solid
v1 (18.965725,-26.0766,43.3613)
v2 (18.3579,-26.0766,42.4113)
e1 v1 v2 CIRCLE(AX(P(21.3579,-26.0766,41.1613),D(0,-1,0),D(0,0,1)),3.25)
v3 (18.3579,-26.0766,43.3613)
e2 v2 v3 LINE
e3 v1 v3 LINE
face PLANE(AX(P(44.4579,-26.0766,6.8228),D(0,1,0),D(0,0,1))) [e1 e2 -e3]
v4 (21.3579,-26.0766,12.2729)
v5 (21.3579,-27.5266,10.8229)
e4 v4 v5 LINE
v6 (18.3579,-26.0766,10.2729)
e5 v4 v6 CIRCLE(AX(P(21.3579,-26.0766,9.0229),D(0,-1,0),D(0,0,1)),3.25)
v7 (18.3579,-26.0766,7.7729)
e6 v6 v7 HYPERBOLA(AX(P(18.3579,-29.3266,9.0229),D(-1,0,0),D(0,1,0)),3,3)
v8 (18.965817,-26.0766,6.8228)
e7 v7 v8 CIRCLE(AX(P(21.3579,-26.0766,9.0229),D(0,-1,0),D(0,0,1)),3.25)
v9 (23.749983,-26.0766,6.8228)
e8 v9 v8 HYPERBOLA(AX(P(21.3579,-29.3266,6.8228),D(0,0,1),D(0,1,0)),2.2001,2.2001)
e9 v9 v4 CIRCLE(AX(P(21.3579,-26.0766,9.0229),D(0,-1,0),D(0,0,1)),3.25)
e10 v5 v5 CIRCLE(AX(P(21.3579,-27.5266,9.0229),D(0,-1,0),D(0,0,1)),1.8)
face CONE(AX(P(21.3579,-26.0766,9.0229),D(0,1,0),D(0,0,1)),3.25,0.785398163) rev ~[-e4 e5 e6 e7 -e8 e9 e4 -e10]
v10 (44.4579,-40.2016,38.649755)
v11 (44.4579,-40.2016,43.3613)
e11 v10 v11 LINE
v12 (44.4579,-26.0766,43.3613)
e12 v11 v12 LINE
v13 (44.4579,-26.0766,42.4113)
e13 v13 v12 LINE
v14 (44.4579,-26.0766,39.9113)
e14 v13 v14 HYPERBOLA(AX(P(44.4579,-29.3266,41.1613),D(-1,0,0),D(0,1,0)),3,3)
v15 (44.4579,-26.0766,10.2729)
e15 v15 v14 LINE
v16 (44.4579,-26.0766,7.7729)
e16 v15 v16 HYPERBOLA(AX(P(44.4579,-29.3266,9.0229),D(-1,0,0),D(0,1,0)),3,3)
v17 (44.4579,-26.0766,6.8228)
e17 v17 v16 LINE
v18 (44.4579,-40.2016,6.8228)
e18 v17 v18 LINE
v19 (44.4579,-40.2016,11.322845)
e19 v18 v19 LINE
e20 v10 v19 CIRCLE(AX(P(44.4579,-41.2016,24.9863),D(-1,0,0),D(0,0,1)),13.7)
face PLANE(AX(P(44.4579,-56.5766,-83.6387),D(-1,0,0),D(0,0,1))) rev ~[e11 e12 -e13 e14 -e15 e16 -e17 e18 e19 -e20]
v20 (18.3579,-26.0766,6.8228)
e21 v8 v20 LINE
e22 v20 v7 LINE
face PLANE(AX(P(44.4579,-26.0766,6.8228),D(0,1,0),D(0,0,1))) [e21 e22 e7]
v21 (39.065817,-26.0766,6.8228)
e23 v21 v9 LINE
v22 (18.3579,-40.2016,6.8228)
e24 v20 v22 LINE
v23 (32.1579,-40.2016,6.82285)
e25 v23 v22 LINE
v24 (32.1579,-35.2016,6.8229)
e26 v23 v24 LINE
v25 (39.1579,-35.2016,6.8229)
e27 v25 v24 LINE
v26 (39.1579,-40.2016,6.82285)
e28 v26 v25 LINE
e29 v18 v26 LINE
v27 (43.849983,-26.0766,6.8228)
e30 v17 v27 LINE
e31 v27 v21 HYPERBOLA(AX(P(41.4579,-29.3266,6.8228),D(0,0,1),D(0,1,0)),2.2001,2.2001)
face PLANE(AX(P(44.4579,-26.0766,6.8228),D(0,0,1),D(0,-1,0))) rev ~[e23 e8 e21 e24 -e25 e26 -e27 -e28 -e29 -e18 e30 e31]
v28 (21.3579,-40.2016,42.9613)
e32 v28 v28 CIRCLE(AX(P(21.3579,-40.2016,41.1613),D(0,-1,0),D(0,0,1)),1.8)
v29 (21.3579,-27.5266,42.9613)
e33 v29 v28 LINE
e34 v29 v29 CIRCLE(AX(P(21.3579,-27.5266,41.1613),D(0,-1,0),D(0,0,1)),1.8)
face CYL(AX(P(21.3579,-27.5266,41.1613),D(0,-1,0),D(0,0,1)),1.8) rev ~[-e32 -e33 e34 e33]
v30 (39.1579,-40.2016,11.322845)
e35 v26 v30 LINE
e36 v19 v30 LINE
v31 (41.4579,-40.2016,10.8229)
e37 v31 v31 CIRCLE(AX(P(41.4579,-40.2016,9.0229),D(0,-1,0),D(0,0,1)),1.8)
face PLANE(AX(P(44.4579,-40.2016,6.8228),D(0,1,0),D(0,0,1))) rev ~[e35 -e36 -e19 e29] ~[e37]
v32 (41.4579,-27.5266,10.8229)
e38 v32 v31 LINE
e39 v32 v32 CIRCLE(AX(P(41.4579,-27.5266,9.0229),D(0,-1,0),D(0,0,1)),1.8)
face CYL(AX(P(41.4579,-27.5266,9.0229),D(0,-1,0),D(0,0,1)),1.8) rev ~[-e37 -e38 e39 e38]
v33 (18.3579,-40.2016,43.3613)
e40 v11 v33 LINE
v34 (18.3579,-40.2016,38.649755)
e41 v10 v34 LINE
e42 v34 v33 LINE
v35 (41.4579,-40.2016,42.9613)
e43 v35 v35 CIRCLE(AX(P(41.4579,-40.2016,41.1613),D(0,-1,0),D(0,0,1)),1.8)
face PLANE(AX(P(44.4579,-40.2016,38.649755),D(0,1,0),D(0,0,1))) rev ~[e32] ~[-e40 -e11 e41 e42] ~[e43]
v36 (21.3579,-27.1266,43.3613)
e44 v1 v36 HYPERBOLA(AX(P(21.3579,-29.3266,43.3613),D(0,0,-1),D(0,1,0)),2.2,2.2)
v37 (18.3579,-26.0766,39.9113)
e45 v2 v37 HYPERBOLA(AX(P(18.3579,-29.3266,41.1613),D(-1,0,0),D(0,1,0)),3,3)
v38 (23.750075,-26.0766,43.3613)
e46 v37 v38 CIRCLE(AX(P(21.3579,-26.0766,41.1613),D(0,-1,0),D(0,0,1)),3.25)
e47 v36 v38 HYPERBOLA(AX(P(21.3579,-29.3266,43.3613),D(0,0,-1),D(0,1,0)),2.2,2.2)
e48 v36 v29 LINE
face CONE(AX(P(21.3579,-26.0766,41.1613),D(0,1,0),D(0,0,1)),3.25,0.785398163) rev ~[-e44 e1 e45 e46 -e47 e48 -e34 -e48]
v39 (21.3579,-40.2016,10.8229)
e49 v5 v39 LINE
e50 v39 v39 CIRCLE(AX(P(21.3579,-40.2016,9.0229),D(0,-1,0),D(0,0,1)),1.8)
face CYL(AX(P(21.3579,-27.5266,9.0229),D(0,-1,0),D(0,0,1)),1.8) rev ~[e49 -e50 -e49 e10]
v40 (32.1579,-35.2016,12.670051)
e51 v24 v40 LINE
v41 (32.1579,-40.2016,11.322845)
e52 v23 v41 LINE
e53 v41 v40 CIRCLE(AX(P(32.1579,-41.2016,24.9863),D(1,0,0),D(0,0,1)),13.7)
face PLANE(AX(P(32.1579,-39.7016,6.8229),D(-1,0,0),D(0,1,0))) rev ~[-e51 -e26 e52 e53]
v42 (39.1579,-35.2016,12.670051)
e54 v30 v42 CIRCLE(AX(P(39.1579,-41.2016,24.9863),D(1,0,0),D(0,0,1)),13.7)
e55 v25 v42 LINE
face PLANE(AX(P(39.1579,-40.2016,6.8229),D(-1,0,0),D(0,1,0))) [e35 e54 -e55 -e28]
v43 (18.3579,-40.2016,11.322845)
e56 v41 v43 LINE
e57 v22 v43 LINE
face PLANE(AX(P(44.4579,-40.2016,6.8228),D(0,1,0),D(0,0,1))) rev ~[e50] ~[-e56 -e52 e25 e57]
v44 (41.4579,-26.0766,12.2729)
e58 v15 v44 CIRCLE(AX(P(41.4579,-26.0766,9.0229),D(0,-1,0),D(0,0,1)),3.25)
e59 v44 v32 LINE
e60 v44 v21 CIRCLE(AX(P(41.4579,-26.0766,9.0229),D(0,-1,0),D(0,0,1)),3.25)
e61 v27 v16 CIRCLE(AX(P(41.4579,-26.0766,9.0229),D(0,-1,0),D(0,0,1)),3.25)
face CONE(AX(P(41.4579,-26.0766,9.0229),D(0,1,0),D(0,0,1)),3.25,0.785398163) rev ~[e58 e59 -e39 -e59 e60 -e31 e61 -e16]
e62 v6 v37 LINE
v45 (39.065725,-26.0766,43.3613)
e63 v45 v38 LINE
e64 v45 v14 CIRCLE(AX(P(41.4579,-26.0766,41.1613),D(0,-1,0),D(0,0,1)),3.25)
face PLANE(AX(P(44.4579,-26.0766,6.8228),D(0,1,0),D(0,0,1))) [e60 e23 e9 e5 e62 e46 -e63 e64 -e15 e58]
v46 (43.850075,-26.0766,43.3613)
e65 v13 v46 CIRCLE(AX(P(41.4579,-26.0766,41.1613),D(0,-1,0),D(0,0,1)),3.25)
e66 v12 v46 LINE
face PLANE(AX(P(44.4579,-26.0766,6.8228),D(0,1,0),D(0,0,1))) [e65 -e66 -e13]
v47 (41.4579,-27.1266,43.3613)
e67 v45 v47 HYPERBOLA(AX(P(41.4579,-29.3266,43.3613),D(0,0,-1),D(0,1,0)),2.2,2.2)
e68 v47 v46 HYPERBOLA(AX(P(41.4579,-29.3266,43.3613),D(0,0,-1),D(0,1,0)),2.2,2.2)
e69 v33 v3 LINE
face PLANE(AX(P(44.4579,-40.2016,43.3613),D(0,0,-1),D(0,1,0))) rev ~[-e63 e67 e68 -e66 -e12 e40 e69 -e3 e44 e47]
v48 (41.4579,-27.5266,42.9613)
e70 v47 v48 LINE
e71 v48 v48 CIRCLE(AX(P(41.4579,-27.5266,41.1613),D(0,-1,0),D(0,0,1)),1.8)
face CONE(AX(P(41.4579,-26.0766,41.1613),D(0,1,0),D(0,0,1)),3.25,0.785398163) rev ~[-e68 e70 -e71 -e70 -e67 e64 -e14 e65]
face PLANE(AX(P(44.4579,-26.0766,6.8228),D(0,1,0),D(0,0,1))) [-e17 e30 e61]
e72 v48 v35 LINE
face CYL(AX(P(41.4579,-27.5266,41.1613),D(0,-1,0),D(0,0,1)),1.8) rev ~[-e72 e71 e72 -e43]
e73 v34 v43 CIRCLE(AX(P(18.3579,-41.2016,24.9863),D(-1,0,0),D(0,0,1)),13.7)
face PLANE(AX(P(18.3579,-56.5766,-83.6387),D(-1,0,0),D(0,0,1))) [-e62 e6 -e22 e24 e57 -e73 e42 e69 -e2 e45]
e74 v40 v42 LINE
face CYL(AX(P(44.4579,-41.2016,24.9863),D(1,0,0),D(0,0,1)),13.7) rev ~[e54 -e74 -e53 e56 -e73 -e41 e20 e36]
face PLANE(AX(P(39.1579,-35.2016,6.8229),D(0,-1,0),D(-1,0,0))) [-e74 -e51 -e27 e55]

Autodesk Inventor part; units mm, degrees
ref_plane "YZ Plane" through (0, 0, 0) normal (1, 0, 0) x (0, 1, 0)
ref_plane "XZ Plane" through (0, 0, 0) normal (0, 1, 0) x (-1, 0, 0)
ref_plane "Work Plane1" through (44.4579, -56.5766, -83.6387) normal (-1, 0, 0) x (0, 0, 1)
sketch "Sketch1" plane through (44.4579, -56.5766, -83.6387) normal (-1, 0, 0) x (0, 0, 1)
  line L0 (90.4615, 0) -> (90.4615, 14.375) projected
  line L1 (90.4615, 14.375) -> (94.9615, 14.375) projected
  arc A0 (94.9615, 14.375) -> (122.2885, 14.375) centre (108.625, 15.375) ccw projected
  line L2 (122.2885, 14.375) -> (127, 14.375) projected
  line L3 (127, 14.375) -> (127, 30.5) projected
  line L4 (52.8275, 30.5) -> (127, 30.5) projected
  line L5 (52.8275, 30.5) -> (52.8275, 10) projected
  line L6 (52.8275, 10) -> (59.8275, 10) projected
  line L7 (59.8275, 10) -> (59.8275, 0) projected
  line L8 (59.8275, 0) -> (90.4615, 0) projected
  line L9 (119.625, 13.875) -> (120.125, 13.875) projected
  line L10 (120.125, 13.875) -> (120.125, 16.875) projected
  line L11 (120.125, 16.875) -> (119.625, 16.875) projected
  line L12 (119.625, 16.875) -> (119.625, 13.875) projected
  line L13 (97.125, 16.875) -> (96.625, 16.875) projected
  line L14 (96.625, 16.875) -> (96.625, 13.875) projected
  line L15 (96.625, 13.875) -> (97.125, 13.875) projected
  line L16 (97.125, 13.875) -> (97.125, 16.875) projected
  circle A1 centre (108.625, 15.375) radius 5 projected
  circle A2 centre (108.625, 15.375) radius 13.7 projected
  line L17 (90.4615, 14.375) -> (127, 14.375)
  line L18 (127, 14.375) -> (127, 30.5)
  line L19 (127, 30.5) -> (90.4615, 30.5)
  line L20 (90.4615, 30.5) -> (90.4615, 14.375)
  line L21 (90.4615, 16.375) -> (127, 16.375)
  point P0 (83.6387, 56.5766)
  point P1 (94.9615, 16.375)
  point P2 (122.2885, 16.375)
  point P3 (127, 16.375)
  dimension "d0" = 2
ref_plane "Work Plane2" through (18.3579, -55.5766, 10.6113) normal (1, 0, 0) x (0, 1, 0)
extrude "Extrusion1" add sketch "Sketch1" along normal up to surface (26.1 mm away) contours L20 L4 L3 L21 A2
sketch "Sketch2" plane through (44.4579, -26.0766, 43.3613) normal (0, 1, 0) x (1, 0, 0)
  line L0 (-26.1, 0) -> (-26.1, 4.7115) projected
  line L1 (0, 0) -> (-26.1, 0) projected
  line L2 (0, 4.7115) -> (0, 0) projected
  line L3 (0, 4.7115) -> (-26.1, 4.7115) projected
  line L4 (-26.1, 32.0385) -> (-26.1, 36.5385) projected
  line L5 (0, 32.0385) -> (-26.1, 32.0385) projected
  line L6 (0, 36.5385) -> (0, 32.0385) projected
  line L7 (0, 36.5385) -> (-26.1, 36.5385) projected
  line L8 (-3, 34.3385) -> (-23.1, 34.3385)
  line L9 (-23.1, 34.3385) -> (-23.1, 2.2)
  line L10 (-23.1, 2.2) -> (-3, 2.2)
  line L11 (-3, 2.2) -> (-3, 34.3385)
  point P0 (-44.4579, 43.3613)
  dimension "d3" = 2.2
  dimension "d4" = 2.2
  dimension "d5" = 3
  dimension "d6" = 3
hole "Hole1" at (41.4579, -26.0766, 9.0229) at (41.4579, -26.0766, 41.1613) at (21.3579, -26.0766, 41.1613) at (21.3579, -26.0766, 9.0229) direction (0, -1, 0) diameter 3.6 end through all countersink diameter 6.5 countersink angle 90
sketch "Sketch3" plane through (44.4579, -40.2016, 6.8229) normal (0, 0, -1) x (-1, 0, 0)
  line L0 (0, 14.125) -> (0.6078, 14.125) projected
  line L1 (0, 14.125) -> (0, 0) projected
  line L2 (0, 0) -> (26.1, 0) projected
  line L3 (26.1, 14.125) -> (26.1, 0) projected
  line L4 (25.4922, 14.125) -> (26.1, 14.125) projected
  line L5 (5.3922, 14.125) -> (20.7078, 14.125) projected
  line L6 (12.3, 0.5) -> (12.3, -2.5) projected
  line L7 (12.3, 0.5) -> (6.3, 0.5) projected
  line L8 (6.3, -2.5) -> (6.3, 0.5) projected
  line L9 (12.3, -2.5) -> (6.3, -2.5) projected
  line L10 (12.3, -14.7) -> (12.3, 12.7) projected
  line L11 (26.1, -2) -> (26.1, -16.375) projected
  line L12 (23.1, -2) -> (26.1, -2) projected
  line L13 (3, -2) -> (23.1, -2) projected
  line L14 (0, -2) -> (3, -2) projected
  line L15 (0, -16.375) -> (0, -2) projected
  line L16 (0, -16.375) -> (26.1, -16.375) projected
  line L17 (12.3, -2) -> (5.3, -2)
  line L18 (5.3, -2) -> (5.3, 5)
  line L19 (5.3, 5) -> (12.3, 5)
  line L20 (12.3, 5) -> (12.3, -2)
  point P0 (44.4579, 40.2016)
  point P1 (12.3, 5)
  point P2 (5.3, -2)
  dimension "d14" = 7
  dimension "d15" = 7
extrude "Extrusion2" cut sketch "Sketch3" against normal blind 10 contours L18 L19 L10 L7 L8 L2 | L2 L8 L13 L18 | L8 L7 L6 L2 | L2 L6 L13 L8
properties part number "right_motor_ceil"
